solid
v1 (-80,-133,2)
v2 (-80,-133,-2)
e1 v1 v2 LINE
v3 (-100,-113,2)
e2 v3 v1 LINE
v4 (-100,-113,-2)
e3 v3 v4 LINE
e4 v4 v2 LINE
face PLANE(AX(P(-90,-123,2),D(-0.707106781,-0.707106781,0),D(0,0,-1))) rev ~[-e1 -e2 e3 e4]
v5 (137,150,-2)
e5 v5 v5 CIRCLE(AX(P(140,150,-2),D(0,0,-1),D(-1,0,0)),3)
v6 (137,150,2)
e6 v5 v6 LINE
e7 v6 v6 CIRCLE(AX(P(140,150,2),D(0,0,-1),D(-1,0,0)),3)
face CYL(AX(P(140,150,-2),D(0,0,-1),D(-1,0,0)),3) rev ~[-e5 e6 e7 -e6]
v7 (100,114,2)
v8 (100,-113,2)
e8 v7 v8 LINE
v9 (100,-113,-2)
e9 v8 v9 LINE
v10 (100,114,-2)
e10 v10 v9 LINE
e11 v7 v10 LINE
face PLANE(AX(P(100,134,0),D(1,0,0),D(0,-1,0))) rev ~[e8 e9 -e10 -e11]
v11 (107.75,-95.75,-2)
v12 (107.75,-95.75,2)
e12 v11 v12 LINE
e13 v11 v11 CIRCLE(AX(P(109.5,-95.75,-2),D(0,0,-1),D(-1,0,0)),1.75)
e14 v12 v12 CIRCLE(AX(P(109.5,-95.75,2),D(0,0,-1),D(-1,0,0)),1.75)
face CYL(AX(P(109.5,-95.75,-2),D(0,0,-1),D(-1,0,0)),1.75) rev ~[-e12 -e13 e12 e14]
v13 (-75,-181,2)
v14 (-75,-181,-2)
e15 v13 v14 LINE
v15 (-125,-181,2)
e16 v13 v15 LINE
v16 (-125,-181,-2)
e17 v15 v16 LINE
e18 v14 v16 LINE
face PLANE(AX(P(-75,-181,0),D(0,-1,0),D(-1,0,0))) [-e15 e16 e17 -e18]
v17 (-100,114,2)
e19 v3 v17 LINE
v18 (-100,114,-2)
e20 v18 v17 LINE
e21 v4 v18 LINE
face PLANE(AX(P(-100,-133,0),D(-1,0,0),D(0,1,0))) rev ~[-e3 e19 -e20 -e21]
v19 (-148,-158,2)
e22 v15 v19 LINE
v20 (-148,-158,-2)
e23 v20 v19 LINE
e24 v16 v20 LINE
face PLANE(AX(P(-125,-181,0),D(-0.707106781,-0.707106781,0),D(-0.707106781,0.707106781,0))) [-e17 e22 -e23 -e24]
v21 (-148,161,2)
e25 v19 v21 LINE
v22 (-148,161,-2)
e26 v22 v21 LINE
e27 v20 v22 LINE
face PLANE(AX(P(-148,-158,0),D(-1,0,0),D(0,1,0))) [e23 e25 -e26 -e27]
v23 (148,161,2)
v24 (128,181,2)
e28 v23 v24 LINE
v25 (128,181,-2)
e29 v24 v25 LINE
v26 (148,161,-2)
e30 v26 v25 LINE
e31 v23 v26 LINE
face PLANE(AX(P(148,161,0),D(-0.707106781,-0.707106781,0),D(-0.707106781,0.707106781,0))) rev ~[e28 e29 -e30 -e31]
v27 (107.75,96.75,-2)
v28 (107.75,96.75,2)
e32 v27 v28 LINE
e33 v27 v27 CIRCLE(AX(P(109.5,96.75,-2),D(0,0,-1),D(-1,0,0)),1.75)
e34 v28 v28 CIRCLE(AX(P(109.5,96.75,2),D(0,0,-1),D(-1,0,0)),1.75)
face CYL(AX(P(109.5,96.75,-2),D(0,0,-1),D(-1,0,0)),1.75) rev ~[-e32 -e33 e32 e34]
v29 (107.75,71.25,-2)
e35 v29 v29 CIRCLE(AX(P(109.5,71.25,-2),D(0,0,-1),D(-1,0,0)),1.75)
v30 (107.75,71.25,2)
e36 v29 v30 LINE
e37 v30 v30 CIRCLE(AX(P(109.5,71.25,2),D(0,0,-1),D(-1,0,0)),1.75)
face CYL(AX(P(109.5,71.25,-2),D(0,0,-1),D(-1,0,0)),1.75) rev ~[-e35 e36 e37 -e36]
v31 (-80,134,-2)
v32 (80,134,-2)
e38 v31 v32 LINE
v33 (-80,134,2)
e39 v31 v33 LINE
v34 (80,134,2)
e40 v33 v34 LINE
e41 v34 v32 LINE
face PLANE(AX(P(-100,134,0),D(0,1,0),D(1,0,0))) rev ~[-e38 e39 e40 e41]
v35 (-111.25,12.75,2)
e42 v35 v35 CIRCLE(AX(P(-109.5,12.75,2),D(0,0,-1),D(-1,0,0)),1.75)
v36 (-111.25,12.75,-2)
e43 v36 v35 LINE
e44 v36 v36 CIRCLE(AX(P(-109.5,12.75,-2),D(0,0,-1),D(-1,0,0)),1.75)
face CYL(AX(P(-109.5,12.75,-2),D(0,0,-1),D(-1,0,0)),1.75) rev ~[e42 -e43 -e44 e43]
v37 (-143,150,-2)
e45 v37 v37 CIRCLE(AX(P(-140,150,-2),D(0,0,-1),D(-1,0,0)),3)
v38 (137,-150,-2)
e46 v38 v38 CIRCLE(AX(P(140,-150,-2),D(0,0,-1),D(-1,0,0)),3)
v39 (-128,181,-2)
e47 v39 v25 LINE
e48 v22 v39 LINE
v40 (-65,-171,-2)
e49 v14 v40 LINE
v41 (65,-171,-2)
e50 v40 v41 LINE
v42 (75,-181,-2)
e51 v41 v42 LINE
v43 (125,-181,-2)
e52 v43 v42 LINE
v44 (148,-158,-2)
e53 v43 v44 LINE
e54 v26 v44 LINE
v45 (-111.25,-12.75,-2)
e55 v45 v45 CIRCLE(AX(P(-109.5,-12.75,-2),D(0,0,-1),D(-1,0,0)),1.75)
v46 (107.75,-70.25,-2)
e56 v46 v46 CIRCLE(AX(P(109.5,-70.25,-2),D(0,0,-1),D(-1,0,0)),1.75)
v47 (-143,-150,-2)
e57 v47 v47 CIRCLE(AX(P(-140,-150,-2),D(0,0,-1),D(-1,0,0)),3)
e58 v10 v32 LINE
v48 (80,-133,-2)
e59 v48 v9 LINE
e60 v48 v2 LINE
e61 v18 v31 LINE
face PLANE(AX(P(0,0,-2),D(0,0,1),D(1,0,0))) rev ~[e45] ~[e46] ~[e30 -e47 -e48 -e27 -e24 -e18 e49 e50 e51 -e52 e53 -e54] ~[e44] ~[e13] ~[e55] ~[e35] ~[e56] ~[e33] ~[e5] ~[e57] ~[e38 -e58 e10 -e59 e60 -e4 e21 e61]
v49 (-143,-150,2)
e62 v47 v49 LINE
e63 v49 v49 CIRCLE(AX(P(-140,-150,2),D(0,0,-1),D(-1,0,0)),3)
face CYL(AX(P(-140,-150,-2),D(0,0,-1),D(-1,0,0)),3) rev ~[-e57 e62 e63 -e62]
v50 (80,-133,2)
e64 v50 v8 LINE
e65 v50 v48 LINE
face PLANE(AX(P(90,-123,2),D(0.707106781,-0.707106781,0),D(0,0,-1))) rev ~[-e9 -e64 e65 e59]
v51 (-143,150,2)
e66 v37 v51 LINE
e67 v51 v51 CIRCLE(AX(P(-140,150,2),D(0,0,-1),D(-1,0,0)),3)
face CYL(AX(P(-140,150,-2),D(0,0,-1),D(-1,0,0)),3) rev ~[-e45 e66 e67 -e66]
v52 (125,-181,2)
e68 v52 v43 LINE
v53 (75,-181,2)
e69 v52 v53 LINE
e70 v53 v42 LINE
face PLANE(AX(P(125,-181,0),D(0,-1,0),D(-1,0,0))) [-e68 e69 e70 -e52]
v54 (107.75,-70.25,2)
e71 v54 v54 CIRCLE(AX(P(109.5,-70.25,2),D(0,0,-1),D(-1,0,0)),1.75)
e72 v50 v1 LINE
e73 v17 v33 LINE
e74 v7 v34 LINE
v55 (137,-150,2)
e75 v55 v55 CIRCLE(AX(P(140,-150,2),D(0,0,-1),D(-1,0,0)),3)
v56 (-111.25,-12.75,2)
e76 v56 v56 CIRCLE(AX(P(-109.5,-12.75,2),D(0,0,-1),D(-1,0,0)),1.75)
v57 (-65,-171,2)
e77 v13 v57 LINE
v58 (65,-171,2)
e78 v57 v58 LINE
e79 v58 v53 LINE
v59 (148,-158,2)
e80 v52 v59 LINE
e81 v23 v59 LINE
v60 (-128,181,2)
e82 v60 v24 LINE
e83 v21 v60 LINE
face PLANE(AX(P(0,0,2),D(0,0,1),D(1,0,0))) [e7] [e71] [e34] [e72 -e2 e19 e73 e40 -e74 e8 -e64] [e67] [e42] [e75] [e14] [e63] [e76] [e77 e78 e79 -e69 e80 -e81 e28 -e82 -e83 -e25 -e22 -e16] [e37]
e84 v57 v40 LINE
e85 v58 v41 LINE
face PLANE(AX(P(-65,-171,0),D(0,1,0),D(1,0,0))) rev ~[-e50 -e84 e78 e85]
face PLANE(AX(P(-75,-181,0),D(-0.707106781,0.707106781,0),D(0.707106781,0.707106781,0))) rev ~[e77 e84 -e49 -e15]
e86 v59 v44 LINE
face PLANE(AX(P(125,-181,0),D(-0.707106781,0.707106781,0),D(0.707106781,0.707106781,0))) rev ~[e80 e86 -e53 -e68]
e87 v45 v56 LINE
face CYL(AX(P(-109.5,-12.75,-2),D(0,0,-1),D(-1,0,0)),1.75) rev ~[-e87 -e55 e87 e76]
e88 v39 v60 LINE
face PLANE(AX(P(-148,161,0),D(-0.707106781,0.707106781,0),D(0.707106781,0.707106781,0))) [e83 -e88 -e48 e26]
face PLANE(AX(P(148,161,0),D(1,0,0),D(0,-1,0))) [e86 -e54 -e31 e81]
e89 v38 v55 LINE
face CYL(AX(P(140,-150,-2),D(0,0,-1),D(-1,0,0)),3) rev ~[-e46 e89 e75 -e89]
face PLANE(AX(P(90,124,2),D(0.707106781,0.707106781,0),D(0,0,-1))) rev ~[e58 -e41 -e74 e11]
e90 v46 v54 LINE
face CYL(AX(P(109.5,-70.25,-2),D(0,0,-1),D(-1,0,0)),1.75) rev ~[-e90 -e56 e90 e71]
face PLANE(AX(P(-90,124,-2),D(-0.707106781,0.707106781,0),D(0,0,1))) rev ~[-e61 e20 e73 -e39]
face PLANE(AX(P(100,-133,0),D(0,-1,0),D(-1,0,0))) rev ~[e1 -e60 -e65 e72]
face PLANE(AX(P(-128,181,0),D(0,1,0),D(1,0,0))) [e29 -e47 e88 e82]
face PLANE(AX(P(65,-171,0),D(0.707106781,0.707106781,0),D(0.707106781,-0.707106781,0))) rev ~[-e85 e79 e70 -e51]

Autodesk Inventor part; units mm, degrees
ref_plane "YZ Plane" through (0, 0, 0) normal (1, 0, 0) x (0, 1, 0)
ref_plane "XZ Plane" through (0, 0, 0) normal (0, 1, 0) x (-1, 0, 0)
ref_plane "XY Plane" through (0, 0, 0) normal (0, 0, 1) x (1, 0, 0)
sketch "Hinges" plane through (0, 0, 0) normal (0, 0, 1) x (1, 0, 0)
  circle A0 centre (-464.8647, 95.9101) radius 1.75
  circle A1 centre (-464.8647, 121.4101) radius 1.75
  line L0 (-471.3647, 88.6601) -> (-455.3647, 88.6601)
  line L1 (-455.3647, 88.6601) -> (-455.3647, 128.6601)
  line L2 (-455.3647, 128.6601) -> (-471.3647, 128.6601)
  line L3 (-471.3647, 128.6601) -> (-471.3647, 88.6601)
  circle A2 centre (-439.8647, 121.4101) radius 1.75
  circle A3 centre (-439.8647, 95.9101) radius 1.75
  line L4 (-433.3647, 128.6601) -> (-449.3647, 128.6601)
  line L5 (-449.3647, 128.6601) -> (-449.3647, 88.6601)
  line L6 (-449.3647, 88.6601) -> (-433.3647, 88.6601)
  line L7 (-433.3647, 88.6601) -> (-433.3647, 128.6601)
  point P0 (-452.3647, 108.6601)
  dimension "d30" = 3.5
  dimension "d31" = 25.5
  dimension "d32" = 6.5
  dimension "d33" = 40
  dimension "d34" = 7.25
  dimension "d35" = 16
  dimension "d36" = 3.5
  dimension "d37" = 25.5
  dimension "d38" = 6.5
  dimension "d39" = 40
  dimension "d40" = 7.25
  dimension "d41" = 16
  dimension "d42" = 38
sketch "Sketch1" plane through (0, 0, 0) normal (0, 0, 1) x (1, 0, 0)
  line L0 (-148, 181) -> (148, 181)
  line L1 (148, 181) -> (148, -181)
  line L2 (148, -181) -> (-148, -181)
  line L3 (-148, -181) -> (-148, 181)
  line L4 (-75, -181) -> (-65, -171)
  line L5 (-75, -181) -> (-60.8579, -181) construction
  line L6 (-65, -171) -> (65, -171)
  line L7 (65, -171) -> (75, -181)
  line L8 (-125, -181) -> (-148, -158)
  line L9 (-125, -181) -> (-92.4731, -181) construction
  line L10 (125, -181) -> (148, -158)
  line L11 (125, -181) -> (157.5269, -181) construction
  line L12 (-148, 161) -> (-128, 181)
  line L13 (-148, 161) -> (-119.7157, 161) construction
  line L14 (148, 161) -> (128, 181)
  line L15 (-100, 134) -> (100, 134)
  line L16 (100, 134) -> (100, -133)
  line L17 (100, -133) -> (-100, -133)
  line L18 (-100, -133) -> (-100, 134)
  point P0 (0, 0)
  point P1 (0, 181)
  point P2 (-148, 0)
  point P3 (0, -171)
  point P4 (0, 134)
  dimension "d0" = 296
  dimension "d1" = 362
  dimension "d2" = 45
  dimension "d3" = 10
  dimension "d4" = 150
  dimension "d5" = 135
  dimension "d6" = 50
  dimension "d7" = 45
  dimension "d8" = 50
  dimension "d9" = 45
  dimension "d10" = 20
  dimension "d11" = 20
  dimension "d12" = 135
  dimension "d13" = 47
  dimension "d14" = 200
  dimension "d15" = 267
extrude "Extrusion1" add sketch "Sketch1" along normal mid plane 4 contours L0 L14 L1 L10 L2 L7 L6 L4 L8 L3 L12
chamfer "Chamfer1" distance 20 angle 45 4 edges at (-100, 134, 0) (100, 134, 0) (-100, -133, 0) (100, -133, 0)
sketch "Sketch3" plane through (0, 0, -2) normal (0, 0, -1) x (-1, 0, 0)
  circle A0 centre (-140, 150) radius 3
  circle A1 centre (-140, -150) radius 3
  circle A2 centre (140, -150) radius 3
  circle A3 centre (140, 150) radius 3
  line L0 (-148, 161) -> (-148, -158) projected
  line L1 (148, -158) -> (148, 161) projected
  point P0 (0, 0)
  dimension "d25" = 6
  dimension "d26" = 300
  dimension "d27" = 150
  dimension "d47" = 8
  dimension "d48" = 8
extrude "Extrusion3" cut sketch "Sketch3" against normal blind 37.5
sketch "Sketch4" plane through (0, 0, -2) normal (0, 0, -1) x (-1, 0, 0)
  line L0 (-100, -113) -> (-100, 114) projected
  line L1 (100, 114) -> (100, -113) projected
  circle A0 centre (-109.5, 71.25) radius 1.75
  circle A1 centre (-109.5, 96.75) radius 1.75
  line L2 (-116, 64) -> (-100, 64)
  line L3 (-100, 64) -> (-100, 104)
  line L4 (-100, 104) -> (-116, 104)
  line L5 (-116, 104) -> (-116, 64)
  circle A2 centre (-84.5, 96.75) radius 1.75
  circle A3 centre (-84.5, 71.25) radius 1.75
  line L6 (-78, 104) -> (-94, 104)
  line L7 (-94, 104) -> (-94, 64)
  line L8 (-94, 64) -> (-78, 64)
  line L9 (-78, 64) -> (-78, 104)
  circle A4 centre (-109.5, -95.75) radius 1.75
  circle A5 centre (-109.5, -70.25) radius 1.75
  line L10 (-116, -103) -> (-100, -103)
  line L11 (-100, -103) -> (-100, -63)
  line L12 (-100, -63) -> (-116, -63)
  line L13 (-116, -63) -> (-116, -103)
  circle A6 centre (-84.5, -70.25) radius 1.75
  circle A7 centre (-84.5, -95.75) radius 1.75
  line L14 (-78, -63) -> (-94, -63)
  line L15 (-94, -63) -> (-94, -103)
  line L16 (-94, -103) -> (-78, -103)
  line L17 (-78, -103) -> (-78, -63)
  circle A8 centre (84.5, -12.75) radius 1.75
  circle A9 centre (84.5, 12.75) radius 1.75
  line L18 (78, -20) -> (94, -20)
  line L19 (94, -20) -> (94, 20)
  line L20 (94, 20) -> (78, 20)
  line L21 (78, 20) -> (78, -20)
  circle A10 centre (109.5, 12.75) radius 1.75
  circle A11 centre (109.5, -12.75) radius 1.75
  line L22 (116, 20) -> (100, 20)
  line L23 (100, 20) -> (100, -20)
  line L24 (100, -20) -> (116, -20)
  line L25 (116, -20) -> (116, 20)
  point P0 (0, 0)
  point P1 (100, 0)
  dimension "d43" = 10
  dimension "d44" = 10
extrude "Extrusion4" cut sketch "Sketch4" against normal blind 10 contours A0 | A1 | A4 | A5 | A10 | A11
equation "\"d27\" = 0.5 * d26"
equation "\"d34\" = -0.5 * d31 + 0.5 * d33"
equation "\"d40\" = -0.5 * d37 + 0.5 * d39"
equation "\"d8\" = d6"
properties part number "Right Sides Cover" material "Wood (Birch)"
